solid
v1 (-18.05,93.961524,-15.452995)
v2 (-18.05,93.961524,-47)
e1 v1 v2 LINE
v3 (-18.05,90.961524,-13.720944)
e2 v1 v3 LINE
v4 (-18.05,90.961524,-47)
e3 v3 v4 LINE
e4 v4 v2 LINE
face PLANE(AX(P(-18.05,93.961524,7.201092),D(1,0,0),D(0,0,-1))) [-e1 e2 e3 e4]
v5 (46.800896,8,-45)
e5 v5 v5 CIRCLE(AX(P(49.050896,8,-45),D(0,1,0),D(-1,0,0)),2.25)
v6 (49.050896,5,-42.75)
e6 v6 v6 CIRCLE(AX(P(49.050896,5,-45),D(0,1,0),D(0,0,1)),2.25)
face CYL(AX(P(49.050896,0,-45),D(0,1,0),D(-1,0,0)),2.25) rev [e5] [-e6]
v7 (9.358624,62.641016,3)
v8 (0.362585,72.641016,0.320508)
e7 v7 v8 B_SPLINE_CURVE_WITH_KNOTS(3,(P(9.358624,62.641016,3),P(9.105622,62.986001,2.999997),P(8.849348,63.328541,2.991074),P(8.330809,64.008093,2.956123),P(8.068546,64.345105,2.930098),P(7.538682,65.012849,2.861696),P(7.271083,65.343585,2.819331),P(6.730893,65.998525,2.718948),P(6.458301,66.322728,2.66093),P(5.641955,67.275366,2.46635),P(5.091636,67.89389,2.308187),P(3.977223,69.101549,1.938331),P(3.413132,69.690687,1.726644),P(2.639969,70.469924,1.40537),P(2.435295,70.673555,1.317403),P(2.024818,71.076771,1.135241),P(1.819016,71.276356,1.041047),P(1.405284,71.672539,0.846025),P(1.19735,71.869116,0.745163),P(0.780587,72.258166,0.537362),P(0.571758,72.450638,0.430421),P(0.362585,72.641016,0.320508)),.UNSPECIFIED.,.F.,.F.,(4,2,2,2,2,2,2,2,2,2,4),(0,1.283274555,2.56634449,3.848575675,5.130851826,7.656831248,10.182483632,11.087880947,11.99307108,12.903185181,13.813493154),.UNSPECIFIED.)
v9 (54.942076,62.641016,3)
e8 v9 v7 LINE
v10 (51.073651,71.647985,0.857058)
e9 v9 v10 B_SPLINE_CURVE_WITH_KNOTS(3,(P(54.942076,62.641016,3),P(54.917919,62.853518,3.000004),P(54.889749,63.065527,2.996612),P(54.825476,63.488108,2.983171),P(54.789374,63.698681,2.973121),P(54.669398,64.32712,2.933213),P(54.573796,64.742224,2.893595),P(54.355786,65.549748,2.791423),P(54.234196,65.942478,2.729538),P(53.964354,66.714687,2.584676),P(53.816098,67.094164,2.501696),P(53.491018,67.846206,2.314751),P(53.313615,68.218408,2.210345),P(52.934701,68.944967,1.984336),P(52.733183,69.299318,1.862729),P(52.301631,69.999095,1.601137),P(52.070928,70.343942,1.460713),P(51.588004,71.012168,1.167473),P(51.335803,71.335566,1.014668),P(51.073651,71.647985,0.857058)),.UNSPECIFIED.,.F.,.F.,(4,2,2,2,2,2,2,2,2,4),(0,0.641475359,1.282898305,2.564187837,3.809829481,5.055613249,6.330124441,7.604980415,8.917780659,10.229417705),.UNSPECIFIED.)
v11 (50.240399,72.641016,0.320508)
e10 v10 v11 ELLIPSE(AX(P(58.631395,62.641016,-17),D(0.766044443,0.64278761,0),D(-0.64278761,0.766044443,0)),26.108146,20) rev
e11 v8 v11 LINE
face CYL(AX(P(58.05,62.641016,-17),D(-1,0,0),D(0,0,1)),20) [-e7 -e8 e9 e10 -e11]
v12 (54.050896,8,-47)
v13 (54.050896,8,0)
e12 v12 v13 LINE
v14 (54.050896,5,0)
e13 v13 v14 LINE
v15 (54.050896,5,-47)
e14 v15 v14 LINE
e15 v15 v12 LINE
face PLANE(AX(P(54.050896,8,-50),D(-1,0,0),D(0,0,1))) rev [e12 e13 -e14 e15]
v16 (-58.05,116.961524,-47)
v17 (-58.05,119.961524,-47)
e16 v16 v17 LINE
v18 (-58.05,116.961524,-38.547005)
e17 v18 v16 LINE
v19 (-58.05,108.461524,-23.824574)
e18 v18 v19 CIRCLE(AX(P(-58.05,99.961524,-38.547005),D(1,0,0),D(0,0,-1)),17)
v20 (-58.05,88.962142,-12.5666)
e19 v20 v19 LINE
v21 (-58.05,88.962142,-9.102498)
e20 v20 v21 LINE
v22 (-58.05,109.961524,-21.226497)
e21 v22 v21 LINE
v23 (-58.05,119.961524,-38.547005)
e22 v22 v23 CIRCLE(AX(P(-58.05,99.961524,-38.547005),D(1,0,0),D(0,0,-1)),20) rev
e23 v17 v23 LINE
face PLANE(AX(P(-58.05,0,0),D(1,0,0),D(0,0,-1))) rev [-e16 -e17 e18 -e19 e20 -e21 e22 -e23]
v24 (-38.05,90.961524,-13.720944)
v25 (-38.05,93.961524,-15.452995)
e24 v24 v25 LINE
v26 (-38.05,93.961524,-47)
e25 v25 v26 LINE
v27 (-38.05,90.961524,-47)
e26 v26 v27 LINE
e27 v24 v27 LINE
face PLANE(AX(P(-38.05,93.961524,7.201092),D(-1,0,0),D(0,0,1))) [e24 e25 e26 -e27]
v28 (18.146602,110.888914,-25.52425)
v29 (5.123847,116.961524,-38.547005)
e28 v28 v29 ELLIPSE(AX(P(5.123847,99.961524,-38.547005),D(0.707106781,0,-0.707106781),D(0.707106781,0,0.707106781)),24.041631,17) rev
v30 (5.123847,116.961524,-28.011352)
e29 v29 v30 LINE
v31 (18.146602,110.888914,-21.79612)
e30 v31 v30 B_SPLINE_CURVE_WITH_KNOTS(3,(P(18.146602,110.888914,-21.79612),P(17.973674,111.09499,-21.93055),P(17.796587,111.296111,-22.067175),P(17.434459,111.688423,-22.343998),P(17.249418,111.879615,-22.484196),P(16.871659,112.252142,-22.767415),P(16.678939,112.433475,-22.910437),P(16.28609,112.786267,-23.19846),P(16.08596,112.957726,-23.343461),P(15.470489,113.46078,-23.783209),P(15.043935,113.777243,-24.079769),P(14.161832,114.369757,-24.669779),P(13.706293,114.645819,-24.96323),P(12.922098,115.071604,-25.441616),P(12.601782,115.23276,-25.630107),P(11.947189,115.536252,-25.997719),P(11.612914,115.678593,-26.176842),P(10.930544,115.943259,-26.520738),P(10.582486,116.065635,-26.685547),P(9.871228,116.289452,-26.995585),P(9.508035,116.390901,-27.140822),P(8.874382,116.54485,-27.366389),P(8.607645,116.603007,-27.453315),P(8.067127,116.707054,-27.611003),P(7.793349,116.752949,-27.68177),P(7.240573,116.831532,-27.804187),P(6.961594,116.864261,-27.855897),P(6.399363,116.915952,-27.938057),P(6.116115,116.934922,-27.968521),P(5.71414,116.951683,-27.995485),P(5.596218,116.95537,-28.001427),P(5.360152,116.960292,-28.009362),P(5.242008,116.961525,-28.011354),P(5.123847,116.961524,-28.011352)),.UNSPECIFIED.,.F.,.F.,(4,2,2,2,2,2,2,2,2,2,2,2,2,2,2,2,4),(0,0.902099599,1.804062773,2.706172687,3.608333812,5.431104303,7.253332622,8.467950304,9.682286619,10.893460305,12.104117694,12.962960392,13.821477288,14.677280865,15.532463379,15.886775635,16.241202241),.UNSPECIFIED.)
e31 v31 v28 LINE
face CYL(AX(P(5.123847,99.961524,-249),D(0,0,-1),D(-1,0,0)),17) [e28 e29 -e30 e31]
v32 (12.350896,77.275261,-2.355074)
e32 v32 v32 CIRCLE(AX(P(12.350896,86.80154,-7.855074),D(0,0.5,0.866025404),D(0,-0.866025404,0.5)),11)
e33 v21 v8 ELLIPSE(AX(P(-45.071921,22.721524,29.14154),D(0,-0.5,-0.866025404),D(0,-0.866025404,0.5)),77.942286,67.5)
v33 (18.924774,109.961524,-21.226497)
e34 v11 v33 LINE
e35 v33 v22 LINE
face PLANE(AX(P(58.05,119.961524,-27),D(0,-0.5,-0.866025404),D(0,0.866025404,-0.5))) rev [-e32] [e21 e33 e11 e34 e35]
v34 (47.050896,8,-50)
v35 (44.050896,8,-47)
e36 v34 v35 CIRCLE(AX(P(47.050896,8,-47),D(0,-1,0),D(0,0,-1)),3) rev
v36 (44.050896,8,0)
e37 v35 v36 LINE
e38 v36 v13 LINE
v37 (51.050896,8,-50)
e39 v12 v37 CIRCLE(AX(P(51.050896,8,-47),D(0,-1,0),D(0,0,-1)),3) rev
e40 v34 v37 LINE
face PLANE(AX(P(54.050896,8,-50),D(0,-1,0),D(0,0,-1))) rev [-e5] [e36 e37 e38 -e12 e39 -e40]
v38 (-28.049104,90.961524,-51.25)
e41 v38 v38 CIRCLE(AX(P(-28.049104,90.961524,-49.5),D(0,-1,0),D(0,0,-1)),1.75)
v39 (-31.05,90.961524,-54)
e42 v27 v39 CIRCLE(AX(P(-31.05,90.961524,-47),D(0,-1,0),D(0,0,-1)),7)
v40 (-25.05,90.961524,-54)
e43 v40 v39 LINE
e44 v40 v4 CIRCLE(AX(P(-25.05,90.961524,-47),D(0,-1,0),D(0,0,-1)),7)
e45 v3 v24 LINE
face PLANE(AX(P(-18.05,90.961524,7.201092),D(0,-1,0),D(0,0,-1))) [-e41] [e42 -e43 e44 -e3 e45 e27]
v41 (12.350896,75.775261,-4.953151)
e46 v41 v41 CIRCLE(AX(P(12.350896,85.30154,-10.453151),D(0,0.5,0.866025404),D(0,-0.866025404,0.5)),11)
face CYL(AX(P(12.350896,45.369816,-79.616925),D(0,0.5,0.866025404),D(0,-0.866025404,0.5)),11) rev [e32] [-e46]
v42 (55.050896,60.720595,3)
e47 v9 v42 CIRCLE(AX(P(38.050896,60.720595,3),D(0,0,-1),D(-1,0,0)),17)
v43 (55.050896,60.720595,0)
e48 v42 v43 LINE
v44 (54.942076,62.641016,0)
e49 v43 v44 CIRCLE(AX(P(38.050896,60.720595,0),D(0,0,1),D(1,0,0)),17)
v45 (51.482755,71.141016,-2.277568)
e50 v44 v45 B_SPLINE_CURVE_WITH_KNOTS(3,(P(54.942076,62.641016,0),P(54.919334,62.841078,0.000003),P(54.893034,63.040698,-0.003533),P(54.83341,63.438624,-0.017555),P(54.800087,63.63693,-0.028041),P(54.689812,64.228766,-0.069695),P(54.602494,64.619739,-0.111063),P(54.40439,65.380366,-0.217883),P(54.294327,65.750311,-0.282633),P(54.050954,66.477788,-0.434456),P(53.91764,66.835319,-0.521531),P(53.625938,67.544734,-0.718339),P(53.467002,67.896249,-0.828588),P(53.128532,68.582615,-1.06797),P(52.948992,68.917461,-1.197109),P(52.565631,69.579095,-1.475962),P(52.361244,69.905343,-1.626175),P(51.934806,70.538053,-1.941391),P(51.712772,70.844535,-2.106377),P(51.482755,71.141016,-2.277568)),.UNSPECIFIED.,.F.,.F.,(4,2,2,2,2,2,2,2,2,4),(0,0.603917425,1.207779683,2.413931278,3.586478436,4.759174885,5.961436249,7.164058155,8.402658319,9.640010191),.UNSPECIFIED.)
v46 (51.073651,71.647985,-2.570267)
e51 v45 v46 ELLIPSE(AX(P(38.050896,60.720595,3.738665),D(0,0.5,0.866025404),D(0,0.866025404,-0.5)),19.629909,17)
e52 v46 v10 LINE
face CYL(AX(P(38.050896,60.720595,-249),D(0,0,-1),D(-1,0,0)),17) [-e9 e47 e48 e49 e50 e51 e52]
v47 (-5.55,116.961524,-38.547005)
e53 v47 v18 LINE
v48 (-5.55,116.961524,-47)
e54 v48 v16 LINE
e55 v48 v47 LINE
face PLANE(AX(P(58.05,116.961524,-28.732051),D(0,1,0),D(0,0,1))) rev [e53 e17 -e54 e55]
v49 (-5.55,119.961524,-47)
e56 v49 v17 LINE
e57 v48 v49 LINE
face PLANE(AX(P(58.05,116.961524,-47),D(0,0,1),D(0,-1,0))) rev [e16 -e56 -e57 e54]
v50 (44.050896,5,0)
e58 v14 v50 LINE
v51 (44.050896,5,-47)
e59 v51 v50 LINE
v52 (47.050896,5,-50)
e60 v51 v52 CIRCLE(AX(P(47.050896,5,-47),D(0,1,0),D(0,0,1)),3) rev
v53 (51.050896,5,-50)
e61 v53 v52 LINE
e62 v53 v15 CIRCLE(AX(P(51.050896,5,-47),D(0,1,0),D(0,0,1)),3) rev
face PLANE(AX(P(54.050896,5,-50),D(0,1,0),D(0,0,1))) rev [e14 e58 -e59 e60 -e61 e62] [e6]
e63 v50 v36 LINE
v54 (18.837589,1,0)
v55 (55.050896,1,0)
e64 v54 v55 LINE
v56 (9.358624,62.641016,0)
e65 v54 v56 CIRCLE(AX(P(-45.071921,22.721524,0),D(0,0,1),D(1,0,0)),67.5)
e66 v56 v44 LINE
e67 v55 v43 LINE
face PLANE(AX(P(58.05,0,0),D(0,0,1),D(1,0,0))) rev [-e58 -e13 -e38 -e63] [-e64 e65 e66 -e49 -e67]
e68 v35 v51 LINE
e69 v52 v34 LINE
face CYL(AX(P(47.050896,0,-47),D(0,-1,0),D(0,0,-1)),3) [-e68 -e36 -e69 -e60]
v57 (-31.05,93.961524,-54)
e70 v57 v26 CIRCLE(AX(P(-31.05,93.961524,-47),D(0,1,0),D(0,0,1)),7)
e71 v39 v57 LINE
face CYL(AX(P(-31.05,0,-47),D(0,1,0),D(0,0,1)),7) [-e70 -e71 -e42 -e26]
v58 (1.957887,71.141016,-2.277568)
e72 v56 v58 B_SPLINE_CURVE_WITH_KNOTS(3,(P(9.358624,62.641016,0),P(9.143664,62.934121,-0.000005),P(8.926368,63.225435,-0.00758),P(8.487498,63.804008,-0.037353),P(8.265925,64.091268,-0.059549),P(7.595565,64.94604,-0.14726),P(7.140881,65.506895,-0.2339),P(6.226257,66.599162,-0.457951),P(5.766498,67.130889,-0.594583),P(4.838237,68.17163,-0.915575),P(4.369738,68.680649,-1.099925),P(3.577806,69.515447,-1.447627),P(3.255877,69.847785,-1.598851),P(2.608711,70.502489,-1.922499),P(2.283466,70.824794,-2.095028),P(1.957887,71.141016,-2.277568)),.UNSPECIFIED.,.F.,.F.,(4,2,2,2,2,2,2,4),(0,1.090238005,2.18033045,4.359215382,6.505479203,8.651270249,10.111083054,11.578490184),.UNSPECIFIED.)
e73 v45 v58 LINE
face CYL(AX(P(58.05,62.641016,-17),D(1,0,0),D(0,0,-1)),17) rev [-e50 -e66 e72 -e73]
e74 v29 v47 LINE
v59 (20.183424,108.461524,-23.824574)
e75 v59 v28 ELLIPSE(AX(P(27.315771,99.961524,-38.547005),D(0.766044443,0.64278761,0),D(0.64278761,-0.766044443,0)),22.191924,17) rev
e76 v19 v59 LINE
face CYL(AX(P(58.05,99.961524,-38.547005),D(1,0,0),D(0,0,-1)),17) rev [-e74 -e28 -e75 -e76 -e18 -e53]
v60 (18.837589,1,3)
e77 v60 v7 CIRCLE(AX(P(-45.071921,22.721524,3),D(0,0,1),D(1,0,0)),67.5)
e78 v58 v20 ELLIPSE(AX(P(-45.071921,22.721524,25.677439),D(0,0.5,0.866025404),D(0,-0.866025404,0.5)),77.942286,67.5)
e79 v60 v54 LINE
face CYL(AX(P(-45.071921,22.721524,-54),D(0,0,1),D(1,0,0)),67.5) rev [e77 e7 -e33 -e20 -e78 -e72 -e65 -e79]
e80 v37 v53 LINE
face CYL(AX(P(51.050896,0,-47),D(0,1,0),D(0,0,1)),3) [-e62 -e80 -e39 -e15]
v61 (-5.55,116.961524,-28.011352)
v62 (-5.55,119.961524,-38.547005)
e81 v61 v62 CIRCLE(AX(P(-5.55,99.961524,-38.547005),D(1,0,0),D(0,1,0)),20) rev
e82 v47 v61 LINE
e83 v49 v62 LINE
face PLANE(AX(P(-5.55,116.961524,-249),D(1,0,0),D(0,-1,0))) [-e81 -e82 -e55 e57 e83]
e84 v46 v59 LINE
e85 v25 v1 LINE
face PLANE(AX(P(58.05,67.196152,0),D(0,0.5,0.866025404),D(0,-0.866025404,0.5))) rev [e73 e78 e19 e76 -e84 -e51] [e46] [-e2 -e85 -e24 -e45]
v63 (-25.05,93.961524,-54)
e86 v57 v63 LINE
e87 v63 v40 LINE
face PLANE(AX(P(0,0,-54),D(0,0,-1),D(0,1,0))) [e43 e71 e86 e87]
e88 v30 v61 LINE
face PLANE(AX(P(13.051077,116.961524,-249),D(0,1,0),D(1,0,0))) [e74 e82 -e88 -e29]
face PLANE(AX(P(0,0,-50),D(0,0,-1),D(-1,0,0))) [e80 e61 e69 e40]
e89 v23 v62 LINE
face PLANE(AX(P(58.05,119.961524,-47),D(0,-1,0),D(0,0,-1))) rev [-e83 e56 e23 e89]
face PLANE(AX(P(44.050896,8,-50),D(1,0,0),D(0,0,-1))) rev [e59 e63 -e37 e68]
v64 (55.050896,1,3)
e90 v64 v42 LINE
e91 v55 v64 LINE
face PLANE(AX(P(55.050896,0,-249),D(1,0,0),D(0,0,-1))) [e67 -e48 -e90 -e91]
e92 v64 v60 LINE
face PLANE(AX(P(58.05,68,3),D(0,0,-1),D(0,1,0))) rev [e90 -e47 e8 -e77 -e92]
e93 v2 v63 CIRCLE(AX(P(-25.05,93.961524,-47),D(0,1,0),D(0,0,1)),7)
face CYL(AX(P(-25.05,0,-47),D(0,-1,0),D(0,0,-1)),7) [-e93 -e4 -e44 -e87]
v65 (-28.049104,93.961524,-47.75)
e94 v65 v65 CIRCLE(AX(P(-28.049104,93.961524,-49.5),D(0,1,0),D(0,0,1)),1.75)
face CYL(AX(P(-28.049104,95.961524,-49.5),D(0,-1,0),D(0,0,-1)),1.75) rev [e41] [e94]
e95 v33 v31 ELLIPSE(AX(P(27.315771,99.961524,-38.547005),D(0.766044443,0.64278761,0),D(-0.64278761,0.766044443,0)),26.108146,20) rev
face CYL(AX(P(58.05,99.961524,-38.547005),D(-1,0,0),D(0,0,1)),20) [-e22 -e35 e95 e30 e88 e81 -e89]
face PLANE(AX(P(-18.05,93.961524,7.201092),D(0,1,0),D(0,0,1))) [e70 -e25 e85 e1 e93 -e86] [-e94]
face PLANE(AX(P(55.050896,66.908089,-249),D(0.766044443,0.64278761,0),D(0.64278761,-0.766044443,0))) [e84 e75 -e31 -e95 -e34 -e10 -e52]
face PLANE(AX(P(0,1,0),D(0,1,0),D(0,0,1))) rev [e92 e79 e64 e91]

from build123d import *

# Parameters (mm, degrees)
SALIENTE_EXTRUIR1_DEPTH = 58.05
REDONDEO1_R             = 20
REDONDEO2_R             = 20
REDONDEO3_R             = 17
REDONDEO4_R             = 17
CAVIDAD1_START          = -47
CAVIDAD1_DEPTH          = 50
CROQUIS8_W              = 10
CROQUIS8_H              = 3
SALIENTE_EXTRUIR2_DEPTH = 50
CROQUIS9_R              = 2.25
CORTAR_EXTRUIR6_DEPTH   = 136.665712106
SALIENTE_EXTRUIR3_REACH = 146.947
CROQUIS11_W             = 20
CROQUIS11_H             = 3
CROQUIS12_W             = 69.238292886
CROQUIS12_H             = 3
CORTAR_EXTRUIR7_DEPTH   = 1
CROQUIS15_R             = 1.75
CORTAR_EXTRUIR10_DEPTH  = 5
REDONDEO5_R             = 7
REDONDEO6_R             = 3
CROQUIS16_R             = 67.5
CORTAR_EXTRUIR11_DEPTH  = 145.946782753
CROQUIS18_R             = 11
CORTAR_EXTRUIR12_DEPTH  = 146.081609054


# Read off the part's stored shape, not the designer's step: Cavidad1
with BuildPart() as part:
    # Croquis1 → Saliente-Extruir1 (new, symmetric)
    with BuildSketch(Plane(origin=(0, 0, 0), x_dir=(0, 0, -1), z_dir=(1, 0, 0))):
        Polygon((0, 0), (0, 67.196152423), (28.732050808, 116.961524227), (47, 116.961524227), (47, 119.961524227), (27, 119.961524227), (-3, 68), (-3, 0), align=None)
    extrude(amount=SALIENTE_EXTRUIR1_DEPTH, both=True)

    # Redondeo1
    redondeo1_edges = [part.edges().sort_by_distance(p)[0] for p in [
        (0, 68, 3),
    ]]
    fillet(redondeo1_edges, radius=REDONDEO1_R)

    # Redondeo2
    redondeo2_edges = [part.edges().sort_by_distance(p)[0] for p in [
        (0, 119.961524227, -27),
    ]]
    fillet(redondeo2_edges, radius=REDONDEO2_R)

    # Redondeo3
    redondeo3_edges = [part.edges().sort_by_distance(p)[0] for p in [
        (0, 116.961524227, -28.732050808),
    ]]
    fillet(redondeo3_edges, radius=REDONDEO3_R)

    # Redondeo4
    redondeo4_edges = [part.edges().sort_by_distance(p)[0] for p in [
        (0, 67.196152423, 0),
    ]]
    fillet(redondeo4_edges, radius=REDONDEO4_R)

    # Cavidad1 outline → Cavidad1 (cut)
    with BuildSketch(Plane.XY.offset(CAVIDAD1_START)):
        with BuildLine():
            Line((58.05, 0), (58.05, 119.961524227))
            Line((58.05, 119.961524227), (-5.55, 119.961524227))
            Line((-5.55, 119.961524227), (-5.55, 116.961524227))
            Line((-5.55, 116.961524227), (5.123846837, 116.961524227))
            ThreePointArc((5.123846837, 116.961524227), (12.308357287, 115.368756607), (18.14660237, 110.888913592))
            Line((18.14660237, 110.888913592), (51.073651347, 71.647984679))
            ThreePointArc((51.073651347, 71.647984679), (54.025670368, 66.534937751), (55.050895814, 60.720595315))
            Line((55.050895814, 60.720595315), (55.050895814, 0))
            Line((55.050895814, 0), (58.05, 0))
        make_face()
    extrude(amount=CAVIDAD1_DEPTH, mode=Mode.SUBTRACT)

    # Croquis8 → Saliente-Extruir2 (add)
    with BuildSketch(Plane(origin=(0, 0, 0), x_dir=(-1, 0, 0), z_dir=(0, 0, -1))):
        with Locations((-49.050895814, 6.5)):
            Rectangle(CROQUIS8_W, CROQUIS8_H)
    extrude(amount=SALIENTE_EXTRUIR2_DEPTH)

    # Croquis9 → Cortar-Extruir6 (cut, through all)
    with BuildSketch(Plane(origin=(0, 8, 0), x_dir=(1, 0, 0), z_dir=(0, 1, 0))):
        with Locations(Location((49.050895814, 45, 0), (0, 0, 180))):
            Circle(CROQUIS9_R)
    extrude(amount=-CORTAR_EXTRUIR6_DEPTH, mode=Mode.SUBTRACT)

    # Saliente-Extruir3: up to this plane
    saliente_extruir3_end = Plane(origin=(58.05, 67.196152423, 0), z_dir=(0, 0.49999999999999767, 0.86602540378444))
    # Croquis11 → Saliente-Extruir3 (add, up to the surface)
    with BuildSketch(Plane(origin=(0, 0, -54), x_dir=(-1, 0, 0), z_dir=(0, 0, -1)), mode=Mode.PRIVATE) as saliente_extruir3_sk1:
        with Locations((28.05, 92.461524227)):
            Rectangle(CROQUIS11_W, CROQUIS11_H)
    saliente_extruir3_tool1 = split(extrude(saliente_extruir3_sk1.sketch, amount=-SALIENTE_EXTRUIR3_REACH, mode=Mode.PRIVATE), bisect_by=saliente_extruir3_end, keep=Keep.BOTH, mode=Mode.PRIVATE)
    add(saliente_extruir3_tool1.solids().sort_by_distance((-28.05, 92.461524, -54))[0])

    # Croquis12 → Cortar-Extruir7 (cut)
    with BuildSketch(Plane.XZ):
        with Locations((20.431749371, 1.5)):
            Rectangle(CROQUIS12_W, CROQUIS12_H)
    extrude(amount=-CORTAR_EXTRUIR7_DEPTH, mode=Mode.SUBTRACT)

    # Croquis15 → Cortar-Extruir10 (cut)
    with BuildSketch(Plane.XZ.offset(-90.961524227)):
        with Locations(Location((-28.049104186, -49.5, 0), (0, 0, 270))):
            Circle(CROQUIS15_R)
    extrude(amount=-CORTAR_EXTRUIR10_DEPTH, mode=Mode.SUBTRACT)

    # Redondeo5
    redondeo5_edges = [part.edges().sort_by_distance(p)[0] for p in [
        (-18.05, 92.461524227, -54),
        (-38.05, 92.461524227, -54),
    ]]
    fillet(redondeo5_edges, radius=REDONDEO5_R)

    # Redondeo6
    redondeo6_edges = [part.edges().sort_by_distance(p)[0] for p in [
        (54.050895814, 6.5, -50),
        (44.050895814, 6.5, -50),
    ]]
    fillet(redondeo6_edges, radius=REDONDEO6_R)

    # Croquis16 → Cortar-Extruir11 (cut, through all)
    with BuildSketch(Plane.XY.offset(3)):
        with Locations((-45.071920691, 22.721524227)):
            Circle(CROQUIS16_R)
    extrude(amount=-CORTAR_EXTRUIR11_DEPTH, mode=Mode.SUBTRACT)

    # Croquis18 → Cortar-Extruir12 (cut, through all)
    with BuildSketch(Plane(origin=(0, 18.299038106, 31.694863729), x_dir=(1, 0, 0), z_dir=(0, 0.4999999999999976, 0.86602540378444))):
        with Locations(Location((12.350895814, 79.099876042, 0), (0, 0, 270))):
            Circle(CROQUIS18_R)
    extrude(amount=-CORTAR_EXTRUIR12_DEPTH, mode=Mode.SUBTRACT)


solid = part.part
